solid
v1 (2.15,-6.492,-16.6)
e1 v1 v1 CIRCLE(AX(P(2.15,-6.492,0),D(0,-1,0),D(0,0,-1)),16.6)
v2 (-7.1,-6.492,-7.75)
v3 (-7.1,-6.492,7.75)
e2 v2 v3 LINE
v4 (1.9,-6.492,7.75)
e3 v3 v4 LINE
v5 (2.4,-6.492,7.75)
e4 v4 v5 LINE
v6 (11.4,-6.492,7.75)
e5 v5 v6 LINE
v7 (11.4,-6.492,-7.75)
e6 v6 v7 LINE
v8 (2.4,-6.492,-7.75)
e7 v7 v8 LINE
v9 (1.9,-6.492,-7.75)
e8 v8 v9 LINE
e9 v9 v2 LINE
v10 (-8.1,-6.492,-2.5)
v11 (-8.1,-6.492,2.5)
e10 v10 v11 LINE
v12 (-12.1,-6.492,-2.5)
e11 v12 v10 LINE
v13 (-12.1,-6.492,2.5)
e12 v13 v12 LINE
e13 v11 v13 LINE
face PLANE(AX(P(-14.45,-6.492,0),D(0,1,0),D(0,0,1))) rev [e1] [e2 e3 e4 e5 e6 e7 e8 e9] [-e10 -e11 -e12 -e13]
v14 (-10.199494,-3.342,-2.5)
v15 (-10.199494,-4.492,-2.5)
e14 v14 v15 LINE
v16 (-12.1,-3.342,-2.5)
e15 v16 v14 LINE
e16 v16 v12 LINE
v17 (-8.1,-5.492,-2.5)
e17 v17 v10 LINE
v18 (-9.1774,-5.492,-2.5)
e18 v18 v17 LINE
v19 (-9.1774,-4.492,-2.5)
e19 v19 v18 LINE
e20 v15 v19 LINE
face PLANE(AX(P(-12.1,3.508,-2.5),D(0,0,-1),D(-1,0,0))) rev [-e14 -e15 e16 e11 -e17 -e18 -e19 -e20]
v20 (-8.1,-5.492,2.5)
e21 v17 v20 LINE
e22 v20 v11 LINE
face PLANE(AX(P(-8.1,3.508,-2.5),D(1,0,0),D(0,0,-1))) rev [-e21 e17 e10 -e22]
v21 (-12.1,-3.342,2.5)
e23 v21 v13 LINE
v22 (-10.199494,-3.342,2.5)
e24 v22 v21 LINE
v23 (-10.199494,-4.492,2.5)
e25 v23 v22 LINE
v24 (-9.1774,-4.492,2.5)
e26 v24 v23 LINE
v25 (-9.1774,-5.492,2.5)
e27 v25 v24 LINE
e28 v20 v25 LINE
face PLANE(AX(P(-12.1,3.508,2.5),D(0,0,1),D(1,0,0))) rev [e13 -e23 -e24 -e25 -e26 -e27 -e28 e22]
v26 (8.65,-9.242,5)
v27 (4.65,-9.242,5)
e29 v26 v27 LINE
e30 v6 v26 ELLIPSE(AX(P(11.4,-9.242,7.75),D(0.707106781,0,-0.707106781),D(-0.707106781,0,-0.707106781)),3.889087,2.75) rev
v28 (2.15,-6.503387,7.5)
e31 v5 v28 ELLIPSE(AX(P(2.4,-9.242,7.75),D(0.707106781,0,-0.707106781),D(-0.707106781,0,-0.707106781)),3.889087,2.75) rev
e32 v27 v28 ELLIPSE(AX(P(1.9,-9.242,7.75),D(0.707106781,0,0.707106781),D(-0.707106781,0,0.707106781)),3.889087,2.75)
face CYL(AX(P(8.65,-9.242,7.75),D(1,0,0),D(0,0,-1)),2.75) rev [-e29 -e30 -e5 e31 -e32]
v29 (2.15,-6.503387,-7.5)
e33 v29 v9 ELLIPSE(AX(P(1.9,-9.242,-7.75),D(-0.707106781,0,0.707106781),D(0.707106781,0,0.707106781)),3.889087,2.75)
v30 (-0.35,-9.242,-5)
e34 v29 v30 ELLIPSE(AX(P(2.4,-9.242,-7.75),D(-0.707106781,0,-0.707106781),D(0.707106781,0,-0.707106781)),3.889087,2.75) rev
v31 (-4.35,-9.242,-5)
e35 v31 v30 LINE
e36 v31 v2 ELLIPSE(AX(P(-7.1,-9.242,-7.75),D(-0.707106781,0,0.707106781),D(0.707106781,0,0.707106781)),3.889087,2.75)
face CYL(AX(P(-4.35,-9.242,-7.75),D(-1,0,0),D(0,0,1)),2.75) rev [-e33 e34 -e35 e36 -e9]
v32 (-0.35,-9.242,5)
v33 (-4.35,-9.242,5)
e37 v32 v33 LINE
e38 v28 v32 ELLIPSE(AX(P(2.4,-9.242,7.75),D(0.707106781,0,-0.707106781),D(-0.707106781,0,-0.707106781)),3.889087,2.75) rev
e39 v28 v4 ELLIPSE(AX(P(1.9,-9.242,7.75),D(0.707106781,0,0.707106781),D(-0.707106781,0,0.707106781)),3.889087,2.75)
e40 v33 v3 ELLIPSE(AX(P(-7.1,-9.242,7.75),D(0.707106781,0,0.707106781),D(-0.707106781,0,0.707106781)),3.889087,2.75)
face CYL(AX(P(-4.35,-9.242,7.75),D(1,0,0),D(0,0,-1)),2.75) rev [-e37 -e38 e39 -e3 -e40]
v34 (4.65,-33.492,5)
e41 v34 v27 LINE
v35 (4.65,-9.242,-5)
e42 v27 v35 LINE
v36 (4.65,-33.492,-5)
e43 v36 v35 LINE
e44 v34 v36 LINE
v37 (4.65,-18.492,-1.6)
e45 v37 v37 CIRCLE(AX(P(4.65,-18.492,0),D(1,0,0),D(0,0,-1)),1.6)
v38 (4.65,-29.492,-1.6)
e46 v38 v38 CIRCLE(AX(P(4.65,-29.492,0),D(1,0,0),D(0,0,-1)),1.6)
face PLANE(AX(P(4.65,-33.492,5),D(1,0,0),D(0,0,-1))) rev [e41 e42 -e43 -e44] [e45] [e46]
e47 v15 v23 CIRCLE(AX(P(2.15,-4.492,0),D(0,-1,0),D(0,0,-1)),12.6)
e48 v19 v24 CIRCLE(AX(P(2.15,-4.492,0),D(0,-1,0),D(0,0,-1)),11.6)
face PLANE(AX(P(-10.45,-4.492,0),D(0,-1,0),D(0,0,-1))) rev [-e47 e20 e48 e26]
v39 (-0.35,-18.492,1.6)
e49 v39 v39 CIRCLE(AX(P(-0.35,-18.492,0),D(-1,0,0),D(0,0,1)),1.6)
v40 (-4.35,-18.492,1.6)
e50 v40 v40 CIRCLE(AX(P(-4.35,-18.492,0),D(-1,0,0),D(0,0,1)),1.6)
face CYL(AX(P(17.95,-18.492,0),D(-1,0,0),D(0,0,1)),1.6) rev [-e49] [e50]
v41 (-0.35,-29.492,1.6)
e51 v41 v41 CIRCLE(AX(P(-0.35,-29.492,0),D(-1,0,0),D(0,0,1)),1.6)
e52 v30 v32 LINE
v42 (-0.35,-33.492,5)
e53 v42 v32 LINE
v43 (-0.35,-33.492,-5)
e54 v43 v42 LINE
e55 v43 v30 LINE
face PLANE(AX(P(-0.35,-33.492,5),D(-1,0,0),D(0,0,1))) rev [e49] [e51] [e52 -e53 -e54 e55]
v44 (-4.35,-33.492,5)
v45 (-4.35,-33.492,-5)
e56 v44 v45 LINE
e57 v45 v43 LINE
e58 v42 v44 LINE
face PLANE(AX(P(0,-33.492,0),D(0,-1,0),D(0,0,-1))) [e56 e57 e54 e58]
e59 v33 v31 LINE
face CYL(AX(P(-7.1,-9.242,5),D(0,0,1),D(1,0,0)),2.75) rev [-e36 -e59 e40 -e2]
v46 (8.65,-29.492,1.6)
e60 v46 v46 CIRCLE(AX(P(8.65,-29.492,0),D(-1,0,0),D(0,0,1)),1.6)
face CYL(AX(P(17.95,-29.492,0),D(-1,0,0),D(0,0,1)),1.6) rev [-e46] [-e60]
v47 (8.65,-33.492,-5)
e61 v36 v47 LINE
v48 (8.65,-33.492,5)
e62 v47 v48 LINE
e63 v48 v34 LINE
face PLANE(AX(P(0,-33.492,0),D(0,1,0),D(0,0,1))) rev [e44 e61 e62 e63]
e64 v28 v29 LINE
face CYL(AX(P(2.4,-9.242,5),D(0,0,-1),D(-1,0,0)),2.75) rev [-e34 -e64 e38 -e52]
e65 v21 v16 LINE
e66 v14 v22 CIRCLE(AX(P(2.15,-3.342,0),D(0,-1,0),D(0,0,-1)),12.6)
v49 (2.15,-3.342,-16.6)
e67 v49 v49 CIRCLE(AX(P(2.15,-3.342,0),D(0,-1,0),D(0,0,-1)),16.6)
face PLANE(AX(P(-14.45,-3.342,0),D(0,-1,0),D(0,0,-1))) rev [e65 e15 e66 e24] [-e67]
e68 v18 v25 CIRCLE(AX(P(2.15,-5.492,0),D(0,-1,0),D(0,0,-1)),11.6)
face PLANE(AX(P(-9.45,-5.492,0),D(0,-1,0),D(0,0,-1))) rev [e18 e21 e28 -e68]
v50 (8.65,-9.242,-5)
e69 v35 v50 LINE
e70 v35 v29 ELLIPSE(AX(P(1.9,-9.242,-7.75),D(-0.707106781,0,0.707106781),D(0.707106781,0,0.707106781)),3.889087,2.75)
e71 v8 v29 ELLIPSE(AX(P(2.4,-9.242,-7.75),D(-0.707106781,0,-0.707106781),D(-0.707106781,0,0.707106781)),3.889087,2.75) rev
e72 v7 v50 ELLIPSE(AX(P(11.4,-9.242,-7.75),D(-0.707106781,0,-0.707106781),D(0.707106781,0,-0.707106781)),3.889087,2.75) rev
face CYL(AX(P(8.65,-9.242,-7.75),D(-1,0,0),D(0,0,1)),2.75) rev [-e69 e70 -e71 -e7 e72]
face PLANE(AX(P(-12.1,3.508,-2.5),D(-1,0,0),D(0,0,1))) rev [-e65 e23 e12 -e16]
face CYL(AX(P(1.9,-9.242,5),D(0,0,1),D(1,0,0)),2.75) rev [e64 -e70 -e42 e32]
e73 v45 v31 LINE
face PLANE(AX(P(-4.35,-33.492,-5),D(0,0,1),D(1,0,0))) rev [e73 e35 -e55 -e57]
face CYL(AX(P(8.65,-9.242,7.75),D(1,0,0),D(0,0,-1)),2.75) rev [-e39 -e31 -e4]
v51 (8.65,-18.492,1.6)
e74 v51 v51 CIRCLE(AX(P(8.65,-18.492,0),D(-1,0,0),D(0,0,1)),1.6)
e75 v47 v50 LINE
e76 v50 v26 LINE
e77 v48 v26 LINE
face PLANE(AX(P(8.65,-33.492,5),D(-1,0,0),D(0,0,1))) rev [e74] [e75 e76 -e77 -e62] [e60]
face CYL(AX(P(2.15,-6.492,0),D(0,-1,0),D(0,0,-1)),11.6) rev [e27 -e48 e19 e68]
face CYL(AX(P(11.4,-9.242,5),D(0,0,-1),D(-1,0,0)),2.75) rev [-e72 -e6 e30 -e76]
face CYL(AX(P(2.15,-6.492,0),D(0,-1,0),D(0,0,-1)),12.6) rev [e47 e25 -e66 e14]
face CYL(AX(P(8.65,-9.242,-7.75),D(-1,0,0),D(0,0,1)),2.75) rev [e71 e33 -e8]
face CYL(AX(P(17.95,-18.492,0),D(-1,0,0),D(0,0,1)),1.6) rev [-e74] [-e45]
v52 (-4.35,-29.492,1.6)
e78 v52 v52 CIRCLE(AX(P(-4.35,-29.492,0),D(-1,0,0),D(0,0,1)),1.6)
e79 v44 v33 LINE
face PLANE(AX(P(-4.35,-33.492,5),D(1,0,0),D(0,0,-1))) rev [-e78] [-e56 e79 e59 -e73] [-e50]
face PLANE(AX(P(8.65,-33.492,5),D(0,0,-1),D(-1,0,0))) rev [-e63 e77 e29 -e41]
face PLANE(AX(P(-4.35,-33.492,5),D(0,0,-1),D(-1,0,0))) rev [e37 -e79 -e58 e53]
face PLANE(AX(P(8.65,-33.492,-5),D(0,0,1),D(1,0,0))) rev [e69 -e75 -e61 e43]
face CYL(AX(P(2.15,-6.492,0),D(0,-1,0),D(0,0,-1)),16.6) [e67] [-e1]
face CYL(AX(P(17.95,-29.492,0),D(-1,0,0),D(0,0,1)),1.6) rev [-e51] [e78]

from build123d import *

# Parameters (mm, degrees)
SKETCH2_W           = 4
SKETCH2_H           = 10
BOSS_EXTRUDE1_DEPTH = 27
SKETCH3_R           = 1.6
CUT_EXTRUDE1_DEPTH  = 22.3
FILLET1_R           = 2.75
SKETCH6_W           = 4
SKETCH6_H           = 5
CUT_EXTRUDE4_DEPTH  = 10


with BuildPart() as part:
    # Sketch1 → Revolve1 (revolve)
    with BuildSketch(Plane.XY, mode=Mode.PRIVATE) as revolve1_sk:
        Polygon((-14.45, -3.342), (-10.45, -3.342), (-10.45, -4.492), (-9.45, -4.492), (-9.45, -5.492), (2.15, -5.492), (2.15, -6.492), (-14.45, -6.492), align=None)
    revolve(revolve1_sk.sketch.rotate(Axis((2.15, -6.492, 0), (0, 1, 0)), 270), axis=Axis((2.15, -6.492, 0), (0, 1, 0)))

    # Sketch2 → Boss-Extrude1 (add)
    with BuildSketch(Plane.XZ.offset(6.492)):
        with Locations((6.65, 0)):
            Rectangle(SKETCH2_W, SKETCH2_H)
        with Locations((-2.35, 0)):
            Rectangle(SKETCH2_W, SKETCH2_H)
    extrude(amount=BOSS_EXTRUDE1_DEPTH)

    # Sketch3 → Cut-Extrude1 (cut)
    with BuildSketch(Plane.ZY.offset(4.35)):
        with Locations((0, -29.492)):
            Circle(SKETCH3_R)
        with Locations((0, -18.492)):
            Circle(SKETCH3_R)
    extrude(amount=-CUT_EXTRUDE1_DEPTH, mode=Mode.SUBTRACT)

    # Fillet1
    # the kernel refuses this fillet: 2.75 mm, written as the material it adds along each edge
    with BuildSketch(Plane(origin=(-4.35, -6.492, -5), x_dir=(-1, 0, 0), z_dir=(0, 0, 1)), Plane(origin=(-0.35, -6.492, 5), x_dir=(1, 0, 0), z_dir=(0, 0, -1)), Plane(origin=(8.65, -6.492, 5), x_dir=(1, 0, 0), z_dir=(0, 0, -1)), Plane(origin=(4.65, -6.492, -5), x_dir=(-1, 0, 0), z_dir=(0, 0, 1))) as fillet1_piece_1:
        with BuildLine():
            CenterArc((FILLET1_R, FILLET1_R), FILLET1_R, 180, 90)
            Line((0, FILLET1_R), (0, 0))
            Line((0, 0), (FILLET1_R, 0))
        make_face()
    extrude(amount=10)
    with BuildSketch(Plane(origin=(6.525, -6.492, -5), x_dir=(0, 0, -1), z_dir=(-1, 0, 0))) as fillet1_piece_2_section:
        with BuildLine():
            CenterArc((FILLET1_R, FILLET1_R), FILLET1_R, 180, 90)
            Line((0, FILLET1_R), (0, 0))
            Line((0, 0), (FILLET1_R, 0))
        make_face()
    fillet1_piece_2 = extrude(amount=10.875, mode=Mode.PRIVATE)
    fillet1_piece_2 = split(fillet1_piece_2, bisect_by=Plane(origin=(4.65, -7.114586564, -5.622586564), z_dir=(1, 0, 0)), keep=Keep.TOP, mode=Mode.PRIVATE)
    add(fillet1_piece_2)
    with BuildSketch(Plane(origin=(-0.35, -6.492, -5), x_dir=(0, 0, -1), z_dir=(-1, 0, 0)), Plane(origin=(-4.35, -6.492, 5), x_dir=(0, 0, 1), z_dir=(1, 0, 0)), Plane(origin=(4.65, -6.492, 5), x_dir=(0, 0, 1), z_dir=(1, 0, 0)), Plane(origin=(8.65, -6.492, -5), x_dir=(0, 0, -1), z_dir=(-1, 0, 0))) as fillet1_piece_3:
        with BuildLine():
            CenterArc((FILLET1_R, FILLET1_R), FILLET1_R, 180, 90)
            Line((0, FILLET1_R), (0, 0))
            Line((0, 0), (FILLET1_R, 0))
        make_face()
    extrude(amount=4)
    with BuildSketch(Plane(origin=(-4.35, -6.492, 5), x_dir=(0, 0, 1), z_dir=(1, 0, 0))) as fillet1_piece_4_section:
        with BuildLine():
            CenterArc((FILLET1_R, FILLET1_R), FILLET1_R, 180, 90)
            Line((0, FILLET1_R), (0, 0))
            Line((0, 0), (FILLET1_R, 0))
        make_face()
    fillet1_piece_4 = extrude(amount=10.875, mode=Mode.PRIVATE)
    fillet1_piece_4 = split(fillet1_piece_4, bisect_by=Plane(origin=(4.65, -7.114586564, 5.622586564), z_dir=(1, 0, 0)), keep=Keep.TOP, mode=Mode.PRIVATE)
    add(fillet1_piece_4)
    with BuildSketch(Plane(origin=(-2.225, -6.492, 5), x_dir=(0, 0, 1), z_dir=(1, 0, 0))) as fillet1_piece_5_section:
        with BuildLine():
            CenterArc((FILLET1_R, FILLET1_R), FILLET1_R, 180, 90)
            Line((0, FILLET1_R), (0, 0))
            Line((0, 0), (FILLET1_R, 0))
        make_face()
    fillet1_piece_5 = extrude(amount=10.875, mode=Mode.PRIVATE)
    fillet1_piece_5 = split(fillet1_piece_5, bisect_by=Plane(origin=(-0.35, -7.114586564, 5.622586564), z_dir=(-1, 0, 0)), keep=Keep.TOP, mode=Mode.PRIVATE)
    add(fillet1_piece_5)
    with BuildSketch(Plane(origin=(8.65, -6.492, -5), x_dir=(0, 0, -1), z_dir=(-1, 0, 0))) as fillet1_piece_6_section:
        with BuildLine():
            CenterArc((FILLET1_R, FILLET1_R), FILLET1_R, 180, 90)
            Line((0, FILLET1_R), (0, 0))
            Line((0, 0), (FILLET1_R, 0))
        make_face()
    fillet1_piece_6 = extrude(amount=10.875, mode=Mode.PRIVATE)
    fillet1_piece_6 = split(fillet1_piece_6, bisect_by=Plane(origin=(-0.35, -7.114586564, -5.622586564), z_dir=(-1, 0, 0)), keep=Keep.TOP, mode=Mode.PRIVATE)
    add(fillet1_piece_6)
    with BuildSketch(Plane(origin=(-4.35, -6.492, -11.875), x_dir=(-1, 0, 0), z_dir=(0, 0, 1))) as fillet1_piece_7a_section:
        with BuildLine():
            CenterArc((FILLET1_R, FILLET1_R), FILLET1_R, 180, 90)
            Line((0, FILLET1_R), (0, 0))
            Line((0, 0), (FILLET1_R, 0))
        make_face()
    fillet1_piece_7a = extrude(amount=16.875, mode=Mode.PRIVATE)
    fillet1_piece_7a = split(fillet1_piece_7a, bisect_by=Plane(origin=(-4.972586564, -7.114586564, -5), z_dir=(0, 0, -1)), keep=Keep.TOP, mode=Mode.PRIVATE)
    with BuildSketch(Plane(origin=(-0.35, -6.492, -5), x_dir=(0, 0, -1), z_dir=(-1, 0, 0))) as fillet1_piece_7b_section:
        with BuildLine():
            CenterArc((FILLET1_R, FILLET1_R), FILLET1_R, 180, 90)
            Line((0, FILLET1_R), (0, 0))
            Line((0, 0), (FILLET1_R, 0))
        make_face()
    fillet1_piece_7b = extrude(amount=10.875, mode=Mode.PRIVATE)
    fillet1_piece_7b = split(fillet1_piece_7b, bisect_by=Plane(origin=(-4.35, -7.114586564, -5.622586564), z_dir=(-1, 0, 0)), keep=Keep.TOP, mode=Mode.PRIVATE)
    fillet1_piece_7 = fillet1_piece_7a & fillet1_piece_7b
    add(fillet1_piece_7)
    with BuildSketch(Plane(origin=(-4.35, -6.492, -5), x_dir=(-1, 0, 0), z_dir=(0, 0, 1))) as fillet1_piece_8a_section:
        with BuildLine():
            CenterArc((FILLET1_R, FILLET1_R), FILLET1_R, 180, 90)
            Line((0, FILLET1_R), (0, 0))
            Line((0, 0), (FILLET1_R, 0))
        make_face()
    fillet1_piece_8a = extrude(amount=16.875, mode=Mode.PRIVATE)
    fillet1_piece_8a = split(fillet1_piece_8a, bisect_by=Plane(origin=(-4.972586564, -7.114586564, 5), z_dir=(0, 0, 1)), keep=Keep.TOP, mode=Mode.PRIVATE)
    with BuildSketch(Plane(origin=(-11.225, -6.492, 5), x_dir=(0, 0, 1), z_dir=(1, 0, 0))) as fillet1_piece_8b_section:
        with BuildLine():
            CenterArc((FILLET1_R, FILLET1_R), FILLET1_R, 180, 90)
            Line((0, FILLET1_R), (0, 0))
            Line((0, 0), (FILLET1_R, 0))
        make_face()
    fillet1_piece_8b = extrude(amount=10.875, mode=Mode.PRIVATE)
    fillet1_piece_8b = split(fillet1_piece_8b, bisect_by=Plane(origin=(-4.35, -7.114586564, 5.622586564), z_dir=(-1, 0, 0)), keep=Keep.TOP, mode=Mode.PRIVATE)
    fillet1_piece_8 = fillet1_piece_8a & fillet1_piece_8b
    add(fillet1_piece_8)
    with BuildSketch(Plane(origin=(6.525, -6.492, -5), x_dir=(0, 0, -1), z_dir=(-1, 0, 0))) as fillet1_piece_9a_section:
        with BuildLine():
            CenterArc((FILLET1_R, FILLET1_R), FILLET1_R, 180, 90)
            Line((0, FILLET1_R), (0, 0))
            Line((0, 0), (FILLET1_R, 0))
        make_face()
    fillet1_piece_9a = extrude(amount=10.875, mode=Mode.PRIVATE)
    fillet1_piece_9a = split(fillet1_piece_9a, bisect_by=Plane(origin=(4.65, -7.114586564, -5.622586564), z_dir=(-1, 0, 0)), keep=Keep.TOP, mode=Mode.PRIVATE)
    fillet1_piece_9a = split(fillet1_piece_9a, bisect_by=Plane(origin=(-0.35, -7.114586564, -5.622586564), z_dir=(1, 0, 0)), keep=Keep.TOP, mode=Mode.PRIVATE)
    with BuildSketch(Plane(origin=(-0.35, -6.492, 5), x_dir=(1, 0, 0), z_dir=(0, 0, -1))) as fillet1_piece_9b_section:
        with BuildLine():
            CenterArc((FILLET1_R, FILLET1_R), FILLET1_R, 180, 90)
            Line((0, FILLET1_R), (0, 0))
            Line((0, 0), (FILLET1_R, 0))
        make_face()
    fillet1_piece_9b = extrude(amount=16.875, mode=Mode.PRIVATE)
    fillet1_piece_9b = split(fillet1_piece_9b, bisect_by=Plane(origin=(0.272586564, -7.114586564, -5), z_dir=(0, 0, -1)), keep=Keep.TOP, mode=Mode.PRIVATE)
    fillet1_piece_9 = fillet1_piece_9a & fillet1_piece_9b
    add(fillet1_piece_9)
    with BuildSketch(Plane(origin=(-0.35, -6.492, 11.875), x_dir=(1, 0, 0), z_dir=(0, 0, -1))) as fillet1_piece_10a_section:
        with BuildLine():
            CenterArc((FILLET1_R, FILLET1_R), FILLET1_R, 180, 90)
            Line((0, FILLET1_R), (0, 0))
            Line((0, 0), (FILLET1_R, 0))
        make_face()
    fillet1_piece_10a = extrude(amount=16.875, mode=Mode.PRIVATE)
    fillet1_piece_10a = split(fillet1_piece_10a, bisect_by=Plane(origin=(0.272586564, -7.114586564, 5), z_dir=(0, 0, 1)), keep=Keep.TOP, mode=Mode.PRIVATE)
    with BuildSketch(Plane(origin=(-4.35, -6.492, 5), x_dir=(0, 0, 1), z_dir=(1, 0, 0))) as fillet1_piece_10b_section:
        with BuildLine():
            CenterArc((FILLET1_R, FILLET1_R), FILLET1_R, 180, 90)
            Line((0, FILLET1_R), (0, 0))
            Line((0, 0), (FILLET1_R, 0))
        make_face()
    fillet1_piece_10b = extrude(amount=10.875, mode=Mode.PRIVATE)
    fillet1_piece_10b = split(fillet1_piece_10b, bisect_by=Plane(origin=(4.65, -7.114586564, 5.622586564), z_dir=(-1, 0, 0)), keep=Keep.TOP, mode=Mode.PRIVATE)
    fillet1_piece_10b = split(fillet1_piece_10b, bisect_by=Plane(origin=(-0.35, -7.114586564, 5.622586564), z_dir=(1, 0, 0)), keep=Keep.TOP, mode=Mode.PRIVATE)
    fillet1_piece_10 = fillet1_piece_10a & fillet1_piece_10b
    add(fillet1_piece_10)
    with BuildSketch(Plane(origin=(8.65, -6.492, 11.875), x_dir=(1, 0, 0), z_dir=(0, 0, -1))) as fillet1_piece_11a_section:
        with BuildLine():
            CenterArc((FILLET1_R, FILLET1_R), FILLET1_R, 180, 90)
            Line((0, FILLET1_R), (0, 0))
            Line((0, 0), (FILLET1_R, 0))
        make_face()
    fillet1_piece_11a = extrude(amount=16.875, mode=Mode.PRIVATE)
    fillet1_piece_11a = split(fillet1_piece_11a, bisect_by=Plane(origin=(9.272586564, -7.114586564, 5), z_dir=(0, 0, 1)), keep=Keep.TOP, mode=Mode.PRIVATE)
    with BuildSketch(Plane(origin=(4.65, -6.492, 5), x_dir=(0, 0, 1), z_dir=(1, 0, 0))) as fillet1_piece_11b_section:
        with BuildLine():
            CenterArc((FILLET1_R, FILLET1_R), FILLET1_R, 180, 90)
            Line((0, FILLET1_R), (0, 0))
            Line((0, 0), (FILLET1_R, 0))
        make_face()
    fillet1_piece_11b = extrude(amount=10.875, mode=Mode.PRIVATE)
    fillet1_piece_11b = split(fillet1_piece_11b, bisect_by=Plane(origin=(8.65, -7.114586564, 5.622586564), z_dir=(1, 0, 0)), keep=Keep.TOP, mode=Mode.PRIVATE)
    fillet1_piece_11 = fillet1_piece_11a & fillet1_piece_11b
    add(fillet1_piece_11)
    with BuildSketch(Plane(origin=(8.65, -6.492, 5), x_dir=(1, 0, 0), z_dir=(0, 0, -1))) as fillet1_piece_12a_section:
        with BuildLine():
            CenterArc((FILLET1_R, FILLET1_R), FILLET1_R, 180, 90)
            Line((0, FILLET1_R), (0, 0))
            Line((0, 0), (FILLET1_R, 0))
        make_face()
    fillet1_piece_12a = extrude(amount=16.875, mode=Mode.PRIVATE)
    fillet1_piece_12a = split(fillet1_piece_12a, bisect_by=Plane(origin=(9.272586564, -7.114586564, -5), z_dir=(0, 0, -1)), keep=Keep.TOP, mode=Mode.PRIVATE)
    with BuildSketch(Plane(origin=(15.525, -6.492, -5), x_dir=(0, 0, -1), z_dir=(-1, 0, 0))) as fillet1_piece_12b_section:
        with BuildLine():
            CenterArc((FILLET1_R, FILLET1_R), FILLET1_R, 180, 90)
            Line((0, FILLET1_R), (0, 0))
            Line((0, 0), (FILLET1_R, 0))
        make_face()
    fillet1_piece_12b = extrude(amount=10.875, mode=Mode.PRIVATE)
    fillet1_piece_12b = split(fillet1_piece_12b, bisect_by=Plane(origin=(8.65, -7.114586564, -5.622586564), z_dir=(1, 0, 0)), keep=Keep.TOP, mode=Mode.PRIVATE)
    fillet1_piece_12 = fillet1_piece_12a & fillet1_piece_12b
    add(fillet1_piece_12)
    with BuildSketch(Plane(origin=(-2.225, -6.492, 5), x_dir=(0, 0, 1), z_dir=(1, 0, 0))) as fillet1_piece_13a_section:
        with BuildLine():
            CenterArc((FILLET1_R, FILLET1_R), FILLET1_R, 180, 90)
            Line((0, FILLET1_R), (0, 0))
            Line((0, 0), (FILLET1_R, 0))
        make_face()
    fillet1_piece_13a = extrude(amount=10.875, mode=Mode.PRIVATE)
    fillet1_piece_13a = split(fillet1_piece_13a, bisect_by=Plane(origin=(4.65, -7.114586564, 5.622586564), z_dir=(-1, 0, 0)), keep=Keep.TOP, mode=Mode.PRIVATE)
    fillet1_piece_13a = split(fillet1_piece_13a, bisect_by=Plane(origin=(-0.35, -7.114586564, 5.622586564), z_dir=(1, 0, 0)), keep=Keep.TOP, mode=Mode.PRIVATE)
    with BuildSketch(Plane(origin=(4.65, -6.492, -5), x_dir=(-1, 0, 0), z_dir=(0, 0, 1))) as fillet1_piece_13b_section:
        with BuildLine():
            CenterArc((FILLET1_R, FILLET1_R), FILLET1_R, 180, 90)
            Line((0, FILLET1_R), (0, 0))
            Line((0, 0), (FILLET1_R, 0))
        make_face()
    fillet1_piece_13b = extrude(amount=16.875, mode=Mode.PRIVATE)
    fillet1_piece_13b = split(fillet1_piece_13b, bisect_by=Plane(origin=(4.027413436, -7.114586564, 5), z_dir=(0, 0, 1)), keep=Keep.TOP, mode=Mode.PRIVATE)
    fillet1_piece_13 = fillet1_piece_13a & fillet1_piece_13b
    add(fillet1_piece_13)
    with BuildSketch(Plane(origin=(4.65, -6.492, -11.875), x_dir=(-1, 0, 0), z_dir=(0, 0, 1))) as fillet1_piece_14a_section:
        with BuildLine():
            CenterArc((FILLET1_R, FILLET1_R), FILLET1_R, 180, 90)
            Line((0, FILLET1_R), (0, 0))
            Line((0, 0), (FILLET1_R, 0))
        make_face()
    fillet1_piece_14a = extrude(amount=16.875, mode=Mode.PRIVATE)
    fillet1_piece_14a = split(fillet1_piece_14a, bisect_by=Plane(origin=(4.027413436, -7.114586564, -5), z_dir=(0, 0, -1)), keep=Keep.TOP, mode=Mode.PRIVATE)
    with BuildSketch(Plane(origin=(8.65, -6.492, -5), x_dir=(0, 0, -1), z_dir=(-1, 0, 0))) as fillet1_piece_14b_section:
        with BuildLine():
            CenterArc((FILLET1_R, FILLET1_R), FILLET1_R, 180, 90)
            Line((0, FILLET1_R), (0, 0))
            Line((0, 0), (FILLET1_R, 0))
        make_face()
    fillet1_piece_14b = extrude(amount=10.875, mode=Mode.PRIVATE)
    fillet1_piece_14b = split(fillet1_piece_14b, bisect_by=Plane(origin=(4.65, -7.114586564, -5.622586564), z_dir=(-1, 0, 0)), keep=Keep.TOP, mode=Mode.PRIVATE)
    fillet1_piece_14b = split(fillet1_piece_14b, bisect_by=Plane(origin=(-0.35, -7.114586564, -5.622586564), z_dir=(1, 0, 0)), keep=Keep.TOP, mode=Mode.PRIVATE)
    fillet1_piece_14 = fillet1_piece_14a & fillet1_piece_14b
    add(fillet1_piece_14)

    # Sketch6 → Cut-Extrude4 (cut)
    with BuildSketch(Plane.XZ.offset(6.492)):
        with Locations((-10.1, 0)):
            Rectangle(SKETCH6_W, SKETCH6_H)
    extrude(amount=-CUT_EXTRUDE4_DEPTH, mode=Mode.SUBTRACT)


solid = part.part
